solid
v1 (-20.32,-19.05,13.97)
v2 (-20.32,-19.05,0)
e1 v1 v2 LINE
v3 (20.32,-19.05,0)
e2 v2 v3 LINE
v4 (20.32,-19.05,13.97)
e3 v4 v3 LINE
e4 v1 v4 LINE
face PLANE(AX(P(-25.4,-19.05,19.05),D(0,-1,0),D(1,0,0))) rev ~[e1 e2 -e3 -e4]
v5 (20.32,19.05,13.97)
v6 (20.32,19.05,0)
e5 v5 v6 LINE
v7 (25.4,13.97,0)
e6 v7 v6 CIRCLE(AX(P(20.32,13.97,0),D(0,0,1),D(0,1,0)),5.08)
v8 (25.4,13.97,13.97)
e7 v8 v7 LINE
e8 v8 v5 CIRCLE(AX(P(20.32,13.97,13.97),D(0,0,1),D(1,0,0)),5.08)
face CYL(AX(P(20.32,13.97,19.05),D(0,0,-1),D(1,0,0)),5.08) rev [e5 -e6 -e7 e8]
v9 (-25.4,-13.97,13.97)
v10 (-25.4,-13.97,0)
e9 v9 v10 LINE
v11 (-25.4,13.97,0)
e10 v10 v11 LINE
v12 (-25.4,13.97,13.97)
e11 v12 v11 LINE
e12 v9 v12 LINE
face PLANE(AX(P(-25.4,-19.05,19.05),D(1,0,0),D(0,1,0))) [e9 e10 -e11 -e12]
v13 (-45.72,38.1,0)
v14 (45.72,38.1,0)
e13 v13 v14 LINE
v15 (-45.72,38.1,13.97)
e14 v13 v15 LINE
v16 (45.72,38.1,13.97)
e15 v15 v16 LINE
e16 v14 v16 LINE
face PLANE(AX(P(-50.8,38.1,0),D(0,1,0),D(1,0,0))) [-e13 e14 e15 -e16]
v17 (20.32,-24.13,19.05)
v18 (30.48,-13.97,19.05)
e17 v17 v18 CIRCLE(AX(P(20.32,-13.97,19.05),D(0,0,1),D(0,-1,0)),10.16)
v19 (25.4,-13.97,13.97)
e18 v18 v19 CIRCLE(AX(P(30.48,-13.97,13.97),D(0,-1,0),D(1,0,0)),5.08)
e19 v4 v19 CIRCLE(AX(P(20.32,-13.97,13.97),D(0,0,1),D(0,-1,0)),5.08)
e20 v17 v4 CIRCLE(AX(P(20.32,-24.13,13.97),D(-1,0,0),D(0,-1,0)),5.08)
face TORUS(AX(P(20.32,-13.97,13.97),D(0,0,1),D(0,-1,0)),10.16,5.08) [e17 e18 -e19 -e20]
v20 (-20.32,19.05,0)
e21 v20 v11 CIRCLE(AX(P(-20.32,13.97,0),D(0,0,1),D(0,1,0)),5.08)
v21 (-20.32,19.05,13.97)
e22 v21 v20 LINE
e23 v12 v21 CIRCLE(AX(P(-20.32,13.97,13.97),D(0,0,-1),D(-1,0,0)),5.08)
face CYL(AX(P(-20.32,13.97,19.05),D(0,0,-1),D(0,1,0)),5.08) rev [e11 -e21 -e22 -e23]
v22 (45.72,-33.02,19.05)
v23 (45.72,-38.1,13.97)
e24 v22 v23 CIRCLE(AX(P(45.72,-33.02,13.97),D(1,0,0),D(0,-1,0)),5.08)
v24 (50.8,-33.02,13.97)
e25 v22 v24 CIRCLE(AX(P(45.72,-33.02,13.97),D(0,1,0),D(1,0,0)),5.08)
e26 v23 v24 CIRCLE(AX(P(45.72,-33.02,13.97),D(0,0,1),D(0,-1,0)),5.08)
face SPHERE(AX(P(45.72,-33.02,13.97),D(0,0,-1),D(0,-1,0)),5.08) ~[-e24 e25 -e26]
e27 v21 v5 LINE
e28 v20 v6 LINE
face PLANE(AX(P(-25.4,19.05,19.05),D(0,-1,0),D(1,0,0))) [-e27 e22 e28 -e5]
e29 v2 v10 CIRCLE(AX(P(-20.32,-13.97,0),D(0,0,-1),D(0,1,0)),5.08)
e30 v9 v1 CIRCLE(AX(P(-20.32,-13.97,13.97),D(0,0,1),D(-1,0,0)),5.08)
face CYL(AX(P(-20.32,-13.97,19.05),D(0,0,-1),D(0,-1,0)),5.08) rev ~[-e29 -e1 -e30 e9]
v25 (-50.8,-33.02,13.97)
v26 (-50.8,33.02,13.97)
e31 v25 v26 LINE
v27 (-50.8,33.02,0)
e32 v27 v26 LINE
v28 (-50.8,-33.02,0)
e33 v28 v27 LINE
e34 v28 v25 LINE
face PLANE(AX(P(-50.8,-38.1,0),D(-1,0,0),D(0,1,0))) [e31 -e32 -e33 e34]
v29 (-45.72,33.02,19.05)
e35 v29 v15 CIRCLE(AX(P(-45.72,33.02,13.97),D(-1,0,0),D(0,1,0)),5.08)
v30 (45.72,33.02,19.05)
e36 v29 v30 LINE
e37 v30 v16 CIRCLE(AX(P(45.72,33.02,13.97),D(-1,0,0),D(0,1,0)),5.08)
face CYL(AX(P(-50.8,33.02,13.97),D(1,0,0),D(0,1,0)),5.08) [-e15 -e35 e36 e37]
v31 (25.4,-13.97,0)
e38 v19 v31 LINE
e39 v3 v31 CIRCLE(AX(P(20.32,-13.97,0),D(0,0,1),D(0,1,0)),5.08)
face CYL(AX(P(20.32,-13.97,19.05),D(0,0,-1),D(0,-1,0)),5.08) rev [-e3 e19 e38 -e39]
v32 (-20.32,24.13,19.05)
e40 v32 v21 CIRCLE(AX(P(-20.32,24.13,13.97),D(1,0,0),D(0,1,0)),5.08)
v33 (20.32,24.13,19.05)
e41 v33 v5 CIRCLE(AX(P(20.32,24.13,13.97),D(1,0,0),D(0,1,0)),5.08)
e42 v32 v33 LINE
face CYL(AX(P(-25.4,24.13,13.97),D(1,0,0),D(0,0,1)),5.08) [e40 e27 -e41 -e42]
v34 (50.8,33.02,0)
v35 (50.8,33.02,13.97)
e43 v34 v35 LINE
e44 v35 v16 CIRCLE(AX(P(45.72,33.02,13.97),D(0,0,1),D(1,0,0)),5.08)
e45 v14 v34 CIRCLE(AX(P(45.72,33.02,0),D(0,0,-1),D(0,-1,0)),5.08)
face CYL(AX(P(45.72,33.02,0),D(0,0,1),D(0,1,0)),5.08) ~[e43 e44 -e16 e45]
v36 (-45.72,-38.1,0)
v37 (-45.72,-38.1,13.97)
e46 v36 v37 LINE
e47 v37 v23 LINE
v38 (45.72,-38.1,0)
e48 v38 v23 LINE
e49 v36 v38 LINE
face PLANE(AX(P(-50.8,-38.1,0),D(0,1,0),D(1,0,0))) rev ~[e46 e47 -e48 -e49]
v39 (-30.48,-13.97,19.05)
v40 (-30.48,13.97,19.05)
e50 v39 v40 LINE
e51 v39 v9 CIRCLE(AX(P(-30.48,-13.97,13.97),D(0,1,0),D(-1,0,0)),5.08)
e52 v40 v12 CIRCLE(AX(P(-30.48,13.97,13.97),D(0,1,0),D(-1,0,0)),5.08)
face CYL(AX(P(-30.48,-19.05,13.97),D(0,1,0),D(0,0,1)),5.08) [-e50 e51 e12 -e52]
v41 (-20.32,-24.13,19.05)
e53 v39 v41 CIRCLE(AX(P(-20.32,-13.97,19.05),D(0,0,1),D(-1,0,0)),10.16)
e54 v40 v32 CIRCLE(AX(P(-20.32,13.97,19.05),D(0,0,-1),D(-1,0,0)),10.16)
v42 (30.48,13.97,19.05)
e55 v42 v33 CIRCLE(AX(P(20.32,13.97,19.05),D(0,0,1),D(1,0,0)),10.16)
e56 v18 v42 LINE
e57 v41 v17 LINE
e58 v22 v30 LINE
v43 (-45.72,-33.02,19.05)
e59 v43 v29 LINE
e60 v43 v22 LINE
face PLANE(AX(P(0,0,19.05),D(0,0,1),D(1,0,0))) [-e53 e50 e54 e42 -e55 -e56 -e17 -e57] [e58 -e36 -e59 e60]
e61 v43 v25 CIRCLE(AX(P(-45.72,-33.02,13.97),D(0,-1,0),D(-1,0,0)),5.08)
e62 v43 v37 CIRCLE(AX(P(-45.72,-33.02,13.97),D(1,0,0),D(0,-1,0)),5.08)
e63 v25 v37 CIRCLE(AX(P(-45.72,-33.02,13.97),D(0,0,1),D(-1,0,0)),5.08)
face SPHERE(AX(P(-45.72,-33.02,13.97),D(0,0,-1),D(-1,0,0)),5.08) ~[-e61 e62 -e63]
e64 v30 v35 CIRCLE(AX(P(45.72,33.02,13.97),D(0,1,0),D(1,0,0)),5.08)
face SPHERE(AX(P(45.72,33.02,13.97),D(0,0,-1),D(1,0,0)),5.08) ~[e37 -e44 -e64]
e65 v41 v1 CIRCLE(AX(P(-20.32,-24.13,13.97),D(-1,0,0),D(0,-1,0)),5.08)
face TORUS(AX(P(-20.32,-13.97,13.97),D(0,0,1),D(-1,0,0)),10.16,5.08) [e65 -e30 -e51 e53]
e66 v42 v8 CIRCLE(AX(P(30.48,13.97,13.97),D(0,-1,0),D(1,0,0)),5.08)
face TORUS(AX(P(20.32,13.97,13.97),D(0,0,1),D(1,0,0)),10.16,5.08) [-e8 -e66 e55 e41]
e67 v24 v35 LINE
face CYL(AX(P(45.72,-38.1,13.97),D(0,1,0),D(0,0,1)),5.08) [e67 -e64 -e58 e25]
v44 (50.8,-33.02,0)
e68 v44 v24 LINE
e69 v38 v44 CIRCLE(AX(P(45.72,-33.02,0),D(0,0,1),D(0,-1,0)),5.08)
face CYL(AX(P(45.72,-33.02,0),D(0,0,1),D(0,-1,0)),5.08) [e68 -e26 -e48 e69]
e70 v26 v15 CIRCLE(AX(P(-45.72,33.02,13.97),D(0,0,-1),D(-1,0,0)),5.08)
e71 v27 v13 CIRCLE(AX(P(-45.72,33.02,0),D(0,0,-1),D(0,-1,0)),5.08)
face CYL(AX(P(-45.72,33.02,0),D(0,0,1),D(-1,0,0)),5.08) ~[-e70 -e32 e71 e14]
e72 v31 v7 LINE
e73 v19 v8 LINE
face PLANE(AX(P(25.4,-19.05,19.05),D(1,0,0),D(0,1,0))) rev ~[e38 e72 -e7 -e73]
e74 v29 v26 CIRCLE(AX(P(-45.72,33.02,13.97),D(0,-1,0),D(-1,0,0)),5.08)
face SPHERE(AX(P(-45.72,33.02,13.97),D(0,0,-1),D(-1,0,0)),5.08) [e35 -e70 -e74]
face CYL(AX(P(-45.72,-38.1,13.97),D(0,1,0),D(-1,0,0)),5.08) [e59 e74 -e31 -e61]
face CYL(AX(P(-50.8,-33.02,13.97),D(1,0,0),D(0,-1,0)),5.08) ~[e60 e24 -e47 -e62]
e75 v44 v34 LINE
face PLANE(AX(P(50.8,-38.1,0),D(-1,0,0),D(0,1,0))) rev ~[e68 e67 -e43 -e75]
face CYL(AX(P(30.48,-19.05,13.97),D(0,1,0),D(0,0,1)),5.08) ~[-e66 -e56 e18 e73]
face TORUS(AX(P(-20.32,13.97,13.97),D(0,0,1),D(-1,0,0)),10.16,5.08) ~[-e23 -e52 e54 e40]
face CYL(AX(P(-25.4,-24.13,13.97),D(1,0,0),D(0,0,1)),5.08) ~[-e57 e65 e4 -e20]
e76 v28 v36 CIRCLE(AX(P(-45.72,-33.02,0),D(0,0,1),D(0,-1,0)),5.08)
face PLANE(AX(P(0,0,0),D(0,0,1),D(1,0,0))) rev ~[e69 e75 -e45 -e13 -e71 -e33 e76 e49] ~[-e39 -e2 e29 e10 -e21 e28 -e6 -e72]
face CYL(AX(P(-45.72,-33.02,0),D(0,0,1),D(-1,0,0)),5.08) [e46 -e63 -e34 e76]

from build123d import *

# Parameters (mm, degrees)
F0_W     = 101.6
F0_H     = 76.2
F1_DEPTH = 19.05
F2_W     = 50.8
F2_H     = 38.1
F3_DEPTH = 25.4
F4_R     = 5.08


with BuildPart() as f1:
    # F0 (on Top) → F1 (new body)
    with BuildSketch(Plane.XY):
        Rectangle(F0_W, F0_H)
    extrude(amount=F1_DEPTH)

    # F2 (on face) → F3 (cut)
    with BuildSketch(Plane.XY.offset(19.05)):
        Rectangle(F2_W, F2_H)
    extrude(amount=-F3_DEPTH, mode=Mode.SUBTRACT)

    # F4
    f4_edges = [f1.edges().sort_by_distance(p)[0] for p in [
        (-50.8, 38.1, 9.525),
        (-50.8, -38.1, 9.525),
        (50.8, 38.1, 9.525),
        (25.4, -19.05, 9.525),
        (-25.4, 19.05, 9.525),
        (50.8, -38.1, 9.525),
        (-25.4, -19.05, 9.525),
        (-25.4, 0, 19.05),
        (-50.8, 0, 19.05),
        (0, -38.1, 19.05),
        (50.8, 0, 19.05),
        (0, 38.1, 19.05),
        (25.4, 19.05, 9.525),
        (0, -19.05, 19.05),
        (25.4, 0, 19.05),
        (0, 19.05, 19.05),
    ]]
    fillet(f4_edges, radius=F4_R)


solid = f1.part
